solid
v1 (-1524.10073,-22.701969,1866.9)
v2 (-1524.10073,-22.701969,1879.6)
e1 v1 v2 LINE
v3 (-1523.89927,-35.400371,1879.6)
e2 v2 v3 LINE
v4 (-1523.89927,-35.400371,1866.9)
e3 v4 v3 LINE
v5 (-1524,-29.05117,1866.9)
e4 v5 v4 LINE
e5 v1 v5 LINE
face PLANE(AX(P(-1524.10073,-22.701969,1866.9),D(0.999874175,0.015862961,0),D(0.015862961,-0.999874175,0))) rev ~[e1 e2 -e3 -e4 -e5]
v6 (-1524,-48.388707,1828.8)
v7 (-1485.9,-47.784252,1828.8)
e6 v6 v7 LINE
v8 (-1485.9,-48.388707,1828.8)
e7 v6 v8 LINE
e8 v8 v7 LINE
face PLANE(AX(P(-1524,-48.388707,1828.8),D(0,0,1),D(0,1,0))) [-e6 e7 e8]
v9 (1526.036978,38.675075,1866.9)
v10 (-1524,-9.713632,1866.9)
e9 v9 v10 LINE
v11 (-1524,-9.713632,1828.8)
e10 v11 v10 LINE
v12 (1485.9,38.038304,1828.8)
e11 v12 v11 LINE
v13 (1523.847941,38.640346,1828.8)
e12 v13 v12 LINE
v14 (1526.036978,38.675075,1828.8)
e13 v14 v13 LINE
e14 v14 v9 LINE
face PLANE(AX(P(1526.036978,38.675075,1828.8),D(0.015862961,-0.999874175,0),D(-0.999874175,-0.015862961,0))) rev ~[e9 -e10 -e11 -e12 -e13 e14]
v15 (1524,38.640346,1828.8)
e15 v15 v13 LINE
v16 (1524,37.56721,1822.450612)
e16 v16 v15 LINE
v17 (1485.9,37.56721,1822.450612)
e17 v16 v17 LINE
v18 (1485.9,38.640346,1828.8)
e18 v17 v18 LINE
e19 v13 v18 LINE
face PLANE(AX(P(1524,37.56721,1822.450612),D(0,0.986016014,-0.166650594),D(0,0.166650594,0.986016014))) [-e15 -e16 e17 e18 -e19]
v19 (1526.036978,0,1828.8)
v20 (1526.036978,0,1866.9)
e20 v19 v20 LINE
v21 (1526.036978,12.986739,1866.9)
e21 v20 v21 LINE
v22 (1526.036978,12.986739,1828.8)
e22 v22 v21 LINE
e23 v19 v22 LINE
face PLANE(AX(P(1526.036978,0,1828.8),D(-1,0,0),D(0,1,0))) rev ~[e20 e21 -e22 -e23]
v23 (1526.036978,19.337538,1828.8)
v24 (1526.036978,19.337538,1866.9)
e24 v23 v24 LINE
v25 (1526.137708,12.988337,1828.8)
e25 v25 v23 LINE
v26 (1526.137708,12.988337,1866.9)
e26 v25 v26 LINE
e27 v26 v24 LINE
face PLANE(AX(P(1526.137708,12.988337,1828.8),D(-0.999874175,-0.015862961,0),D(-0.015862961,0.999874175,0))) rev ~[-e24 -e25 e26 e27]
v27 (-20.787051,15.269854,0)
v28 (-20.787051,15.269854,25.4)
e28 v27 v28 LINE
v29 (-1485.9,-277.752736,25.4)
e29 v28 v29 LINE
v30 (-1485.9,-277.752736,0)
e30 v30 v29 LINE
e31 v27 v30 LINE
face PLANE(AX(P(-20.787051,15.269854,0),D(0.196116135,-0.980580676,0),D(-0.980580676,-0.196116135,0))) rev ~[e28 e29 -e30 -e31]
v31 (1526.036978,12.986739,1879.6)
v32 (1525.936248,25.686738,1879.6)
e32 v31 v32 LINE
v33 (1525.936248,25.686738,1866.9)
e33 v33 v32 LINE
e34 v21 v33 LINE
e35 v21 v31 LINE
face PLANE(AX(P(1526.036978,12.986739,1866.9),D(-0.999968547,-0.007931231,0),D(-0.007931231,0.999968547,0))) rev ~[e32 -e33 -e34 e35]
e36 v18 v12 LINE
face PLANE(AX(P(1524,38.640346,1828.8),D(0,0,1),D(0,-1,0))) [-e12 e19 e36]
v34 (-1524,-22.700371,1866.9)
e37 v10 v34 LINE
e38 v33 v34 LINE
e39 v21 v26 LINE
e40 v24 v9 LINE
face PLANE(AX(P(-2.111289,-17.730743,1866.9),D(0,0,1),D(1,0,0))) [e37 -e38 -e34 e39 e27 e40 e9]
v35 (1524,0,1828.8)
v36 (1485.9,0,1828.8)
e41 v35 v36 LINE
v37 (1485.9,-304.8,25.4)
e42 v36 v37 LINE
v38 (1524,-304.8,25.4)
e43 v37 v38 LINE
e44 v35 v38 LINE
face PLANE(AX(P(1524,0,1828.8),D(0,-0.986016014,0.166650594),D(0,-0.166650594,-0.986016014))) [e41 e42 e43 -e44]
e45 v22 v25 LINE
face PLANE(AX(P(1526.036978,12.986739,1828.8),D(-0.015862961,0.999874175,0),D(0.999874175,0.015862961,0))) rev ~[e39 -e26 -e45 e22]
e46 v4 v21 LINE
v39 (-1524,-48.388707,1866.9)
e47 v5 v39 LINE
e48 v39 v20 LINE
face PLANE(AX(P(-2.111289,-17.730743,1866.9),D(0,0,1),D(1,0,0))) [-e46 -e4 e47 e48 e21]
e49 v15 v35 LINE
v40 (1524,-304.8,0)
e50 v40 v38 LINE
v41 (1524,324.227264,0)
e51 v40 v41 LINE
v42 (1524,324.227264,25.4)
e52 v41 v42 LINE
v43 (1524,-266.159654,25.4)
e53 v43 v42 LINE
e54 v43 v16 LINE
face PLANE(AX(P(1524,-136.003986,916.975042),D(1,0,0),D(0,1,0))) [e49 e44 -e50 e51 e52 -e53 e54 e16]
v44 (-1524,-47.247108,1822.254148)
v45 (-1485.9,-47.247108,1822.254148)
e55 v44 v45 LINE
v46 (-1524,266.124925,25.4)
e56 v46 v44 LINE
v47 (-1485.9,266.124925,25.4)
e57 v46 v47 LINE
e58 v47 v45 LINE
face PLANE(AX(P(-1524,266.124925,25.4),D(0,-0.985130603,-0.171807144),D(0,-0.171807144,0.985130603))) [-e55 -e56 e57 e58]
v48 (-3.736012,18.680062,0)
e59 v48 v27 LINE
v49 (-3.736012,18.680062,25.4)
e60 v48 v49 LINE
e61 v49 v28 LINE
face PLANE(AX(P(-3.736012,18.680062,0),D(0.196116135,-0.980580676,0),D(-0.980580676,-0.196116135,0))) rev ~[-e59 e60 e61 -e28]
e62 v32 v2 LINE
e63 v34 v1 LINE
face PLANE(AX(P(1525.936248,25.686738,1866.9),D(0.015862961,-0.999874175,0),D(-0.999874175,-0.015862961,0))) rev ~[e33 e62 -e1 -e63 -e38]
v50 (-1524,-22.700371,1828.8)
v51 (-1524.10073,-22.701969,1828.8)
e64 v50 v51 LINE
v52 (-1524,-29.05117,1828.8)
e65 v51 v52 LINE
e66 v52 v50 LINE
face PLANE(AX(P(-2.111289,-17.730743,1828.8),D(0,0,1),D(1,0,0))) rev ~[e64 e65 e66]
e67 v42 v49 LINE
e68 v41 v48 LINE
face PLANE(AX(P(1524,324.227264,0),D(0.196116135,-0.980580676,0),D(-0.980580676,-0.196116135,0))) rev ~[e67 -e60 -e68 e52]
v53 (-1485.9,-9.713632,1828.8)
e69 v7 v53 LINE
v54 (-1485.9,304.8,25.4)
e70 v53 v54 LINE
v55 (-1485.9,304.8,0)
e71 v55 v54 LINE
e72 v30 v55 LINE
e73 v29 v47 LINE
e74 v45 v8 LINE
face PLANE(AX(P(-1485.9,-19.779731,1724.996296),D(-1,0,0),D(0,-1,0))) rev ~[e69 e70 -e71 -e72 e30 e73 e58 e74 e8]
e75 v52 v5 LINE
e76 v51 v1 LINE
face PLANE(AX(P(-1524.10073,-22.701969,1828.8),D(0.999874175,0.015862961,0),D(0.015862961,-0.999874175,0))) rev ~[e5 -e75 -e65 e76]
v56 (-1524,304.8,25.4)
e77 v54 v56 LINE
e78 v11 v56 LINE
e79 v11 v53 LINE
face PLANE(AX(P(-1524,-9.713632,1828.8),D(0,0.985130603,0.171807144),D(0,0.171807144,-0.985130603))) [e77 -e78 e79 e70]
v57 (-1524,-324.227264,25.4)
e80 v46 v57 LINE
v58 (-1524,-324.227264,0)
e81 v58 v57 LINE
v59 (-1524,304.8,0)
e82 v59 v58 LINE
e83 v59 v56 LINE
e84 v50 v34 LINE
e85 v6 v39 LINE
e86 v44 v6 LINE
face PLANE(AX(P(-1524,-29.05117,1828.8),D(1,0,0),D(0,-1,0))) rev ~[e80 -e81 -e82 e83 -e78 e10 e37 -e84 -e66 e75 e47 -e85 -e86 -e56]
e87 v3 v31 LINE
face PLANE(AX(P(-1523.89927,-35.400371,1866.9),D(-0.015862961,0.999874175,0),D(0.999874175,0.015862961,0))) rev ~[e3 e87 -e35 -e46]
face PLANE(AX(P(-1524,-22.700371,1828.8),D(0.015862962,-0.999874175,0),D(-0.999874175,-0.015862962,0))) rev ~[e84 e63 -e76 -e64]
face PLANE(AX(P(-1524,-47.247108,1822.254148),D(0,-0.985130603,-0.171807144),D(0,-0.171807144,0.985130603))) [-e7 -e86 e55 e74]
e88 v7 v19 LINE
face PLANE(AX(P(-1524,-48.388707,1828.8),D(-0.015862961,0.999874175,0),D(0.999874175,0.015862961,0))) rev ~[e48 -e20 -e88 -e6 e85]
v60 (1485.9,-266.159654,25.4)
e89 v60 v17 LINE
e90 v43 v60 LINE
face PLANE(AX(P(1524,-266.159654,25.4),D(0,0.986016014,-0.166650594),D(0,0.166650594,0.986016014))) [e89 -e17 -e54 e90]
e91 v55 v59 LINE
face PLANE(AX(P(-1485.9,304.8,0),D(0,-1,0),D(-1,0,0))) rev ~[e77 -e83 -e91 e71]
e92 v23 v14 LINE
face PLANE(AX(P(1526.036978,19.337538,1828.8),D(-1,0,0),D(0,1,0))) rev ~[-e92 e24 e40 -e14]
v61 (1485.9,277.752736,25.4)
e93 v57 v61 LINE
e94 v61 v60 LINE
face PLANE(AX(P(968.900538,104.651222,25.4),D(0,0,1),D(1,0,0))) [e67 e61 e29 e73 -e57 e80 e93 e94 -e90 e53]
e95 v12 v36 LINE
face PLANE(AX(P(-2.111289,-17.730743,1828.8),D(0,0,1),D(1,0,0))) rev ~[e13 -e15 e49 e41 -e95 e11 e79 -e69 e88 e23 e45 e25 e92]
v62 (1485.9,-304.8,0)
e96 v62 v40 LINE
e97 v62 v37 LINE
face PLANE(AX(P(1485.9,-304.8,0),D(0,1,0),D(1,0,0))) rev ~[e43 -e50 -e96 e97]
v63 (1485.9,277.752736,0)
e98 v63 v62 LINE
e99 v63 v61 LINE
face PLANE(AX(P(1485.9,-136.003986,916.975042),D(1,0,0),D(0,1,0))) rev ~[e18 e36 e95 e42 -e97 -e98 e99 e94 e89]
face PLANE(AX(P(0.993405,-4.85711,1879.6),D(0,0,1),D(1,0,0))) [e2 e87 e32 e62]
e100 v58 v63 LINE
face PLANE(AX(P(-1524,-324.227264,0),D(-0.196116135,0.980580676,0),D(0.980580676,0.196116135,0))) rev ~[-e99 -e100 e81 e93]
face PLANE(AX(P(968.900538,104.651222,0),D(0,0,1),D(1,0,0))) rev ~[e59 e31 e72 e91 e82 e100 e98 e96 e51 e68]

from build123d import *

# Parameters (mm, degrees)
F1_DEPTH = 25.4
F3_DEPTH = 38.1
F5_DEPTH = 38.1
F7_DEPTH = 38.1
F9_DEPTH = 12.7


# Not quite as in the source:
# - ends of sketch curves that miss each other by under 0.0002 mm in the source are joined


with BuildPart() as f1:
    # F0 (on Top) → F1 (new body)
    with BuildSketch(Plane.XY):
        Polygon((1524, -304.8), (1524, 324.2272643468), (-3.7360123744, 18.6800618719), (-3.0765473876, 15.3827369381), (179.8806457879, 16.5488648108), (1485.9, 277.7527356532), (1485.9, -9.5795955801), (1485.9, -304.8), align=None)
        Polygon((-1485.941186152, 124.6566928906), (-1485.9, 124.6078212585), (-1485.9, 183.7307214737), align=None)
        Polygon((179.8806457879, 16.5488648108), (-3.0765473876, 15.3827369381), (-20.7870508093, 15.2698541849), (-198.7212794918, -20.3169915516), (1.9464171055, -19.0379809257), align=None)
        Polygon((-3.0765473876, 15.3827369381), (-3.7360123744, 18.6800618719), (-20.7870508093, 15.2698541849), align=None)
        Polygon((1.9464171055, -19.0379809257), (-198.7212794918, -20.3169915516), (-1485.9, -277.7527356532), (-1485.9, 124.6078212585), (-1485.941186152, 124.6566928906), (-1485.9, 183.7307214737), (-1485.9, 304.8), (-1524, 304.8), (-1524, -324.2272643468), align=None)
    extrude(amount=F1_DEPTH)

    # F2 (on face) → F3 (join)
    with BuildSketch(Plane.YZ.offset(1524)):
        Polygon((-266.1596539356, 25.4), (0, 1600.1779524521), (0, 1828.8), (-304.8, 25.4), align=None)
        Polygon((0, 1828.8), (0, 1600.1779524521), (37.5672101274, 1822.4506123728), align=None)
        Polygon((38.6403460644, 1828.8), (0, 1828.8), (37.5672101274, 1822.4506123728), align=None)
    extrude(amount=-F3_DEPTH)

    # F4 (on face) → F5 (join)
    with BuildSketch(Plane(origin=(-1524, 0, 0), x_dir=(0, -1, 0), z_dir=(-1, 0, 0))):
        Polygon((9.7136321734, 1828.8), (9.7136321734, 1607.03972256), (47.2471081512, 1822.2541477998), align=None)
        Polygon((48.3887072147, 1828.8), (9.7136321734, 1828.8), (47.2471081512, 1822.2541477998), align=None)
        Polygon((-266.1249249587, 25.4), (9.7136321734, 1607.03972256), (9.7136321734, 1828.8), (-304.8, 25.4), align=None)
    extrude(amount=-F5_DEPTH)

    # F6 (on face) → F7 (join)
    with BuildSketch(Plane.XY.offset(1828.8)):
        Polygon((-1524, -29.0511696941), (-1524, -48.3887072147), (1526.0369777679, 0), (1526.0369777679, 12.9867385989), (-1523.899270198, -35.4003705418), align=None)
        Polygon((-1524.1007298046, -22.7019686808), (-1524, -29.0511696941), (-1524, -22.7003706067), align=None)
        Polygon((-1524, -22.7003706067), (-1524, -29.0511696941), (-1523.899270198, -35.4003705418), (1526.0369777679, 12.9867385989), (1526.0369777679, 19.3375375207), (1525.9362479633, 25.6867385339), align=None)
        Polygon((1526.0369777679, 19.3375375207), (1526.0369777679, 12.9867385989), (1526.1377075699, 12.9883366729), align=None)
        Polygon((-1524, -9.7136321734), (-1524, -22.7003706067), (1525.9362479633, 25.6867385339), (1526.0369777679, 19.3375375207), (1526.0369777679, 38.6750750413), align=None)
    extrude(amount=F7_DEPTH)

    # F8 (on face) → F9 (join)
    with BuildSketch(Plane.XY.offset(1866.9)):
        Polygon((1526.0369777679, 12.9867385989), (1525.9362479641, 25.6867384858), (-1524.1007298039, -22.701968729), (-1523.8992701954, -35.4003707073), align=None)
    extrude(amount=F9_DEPTH)


solid = f1.part
